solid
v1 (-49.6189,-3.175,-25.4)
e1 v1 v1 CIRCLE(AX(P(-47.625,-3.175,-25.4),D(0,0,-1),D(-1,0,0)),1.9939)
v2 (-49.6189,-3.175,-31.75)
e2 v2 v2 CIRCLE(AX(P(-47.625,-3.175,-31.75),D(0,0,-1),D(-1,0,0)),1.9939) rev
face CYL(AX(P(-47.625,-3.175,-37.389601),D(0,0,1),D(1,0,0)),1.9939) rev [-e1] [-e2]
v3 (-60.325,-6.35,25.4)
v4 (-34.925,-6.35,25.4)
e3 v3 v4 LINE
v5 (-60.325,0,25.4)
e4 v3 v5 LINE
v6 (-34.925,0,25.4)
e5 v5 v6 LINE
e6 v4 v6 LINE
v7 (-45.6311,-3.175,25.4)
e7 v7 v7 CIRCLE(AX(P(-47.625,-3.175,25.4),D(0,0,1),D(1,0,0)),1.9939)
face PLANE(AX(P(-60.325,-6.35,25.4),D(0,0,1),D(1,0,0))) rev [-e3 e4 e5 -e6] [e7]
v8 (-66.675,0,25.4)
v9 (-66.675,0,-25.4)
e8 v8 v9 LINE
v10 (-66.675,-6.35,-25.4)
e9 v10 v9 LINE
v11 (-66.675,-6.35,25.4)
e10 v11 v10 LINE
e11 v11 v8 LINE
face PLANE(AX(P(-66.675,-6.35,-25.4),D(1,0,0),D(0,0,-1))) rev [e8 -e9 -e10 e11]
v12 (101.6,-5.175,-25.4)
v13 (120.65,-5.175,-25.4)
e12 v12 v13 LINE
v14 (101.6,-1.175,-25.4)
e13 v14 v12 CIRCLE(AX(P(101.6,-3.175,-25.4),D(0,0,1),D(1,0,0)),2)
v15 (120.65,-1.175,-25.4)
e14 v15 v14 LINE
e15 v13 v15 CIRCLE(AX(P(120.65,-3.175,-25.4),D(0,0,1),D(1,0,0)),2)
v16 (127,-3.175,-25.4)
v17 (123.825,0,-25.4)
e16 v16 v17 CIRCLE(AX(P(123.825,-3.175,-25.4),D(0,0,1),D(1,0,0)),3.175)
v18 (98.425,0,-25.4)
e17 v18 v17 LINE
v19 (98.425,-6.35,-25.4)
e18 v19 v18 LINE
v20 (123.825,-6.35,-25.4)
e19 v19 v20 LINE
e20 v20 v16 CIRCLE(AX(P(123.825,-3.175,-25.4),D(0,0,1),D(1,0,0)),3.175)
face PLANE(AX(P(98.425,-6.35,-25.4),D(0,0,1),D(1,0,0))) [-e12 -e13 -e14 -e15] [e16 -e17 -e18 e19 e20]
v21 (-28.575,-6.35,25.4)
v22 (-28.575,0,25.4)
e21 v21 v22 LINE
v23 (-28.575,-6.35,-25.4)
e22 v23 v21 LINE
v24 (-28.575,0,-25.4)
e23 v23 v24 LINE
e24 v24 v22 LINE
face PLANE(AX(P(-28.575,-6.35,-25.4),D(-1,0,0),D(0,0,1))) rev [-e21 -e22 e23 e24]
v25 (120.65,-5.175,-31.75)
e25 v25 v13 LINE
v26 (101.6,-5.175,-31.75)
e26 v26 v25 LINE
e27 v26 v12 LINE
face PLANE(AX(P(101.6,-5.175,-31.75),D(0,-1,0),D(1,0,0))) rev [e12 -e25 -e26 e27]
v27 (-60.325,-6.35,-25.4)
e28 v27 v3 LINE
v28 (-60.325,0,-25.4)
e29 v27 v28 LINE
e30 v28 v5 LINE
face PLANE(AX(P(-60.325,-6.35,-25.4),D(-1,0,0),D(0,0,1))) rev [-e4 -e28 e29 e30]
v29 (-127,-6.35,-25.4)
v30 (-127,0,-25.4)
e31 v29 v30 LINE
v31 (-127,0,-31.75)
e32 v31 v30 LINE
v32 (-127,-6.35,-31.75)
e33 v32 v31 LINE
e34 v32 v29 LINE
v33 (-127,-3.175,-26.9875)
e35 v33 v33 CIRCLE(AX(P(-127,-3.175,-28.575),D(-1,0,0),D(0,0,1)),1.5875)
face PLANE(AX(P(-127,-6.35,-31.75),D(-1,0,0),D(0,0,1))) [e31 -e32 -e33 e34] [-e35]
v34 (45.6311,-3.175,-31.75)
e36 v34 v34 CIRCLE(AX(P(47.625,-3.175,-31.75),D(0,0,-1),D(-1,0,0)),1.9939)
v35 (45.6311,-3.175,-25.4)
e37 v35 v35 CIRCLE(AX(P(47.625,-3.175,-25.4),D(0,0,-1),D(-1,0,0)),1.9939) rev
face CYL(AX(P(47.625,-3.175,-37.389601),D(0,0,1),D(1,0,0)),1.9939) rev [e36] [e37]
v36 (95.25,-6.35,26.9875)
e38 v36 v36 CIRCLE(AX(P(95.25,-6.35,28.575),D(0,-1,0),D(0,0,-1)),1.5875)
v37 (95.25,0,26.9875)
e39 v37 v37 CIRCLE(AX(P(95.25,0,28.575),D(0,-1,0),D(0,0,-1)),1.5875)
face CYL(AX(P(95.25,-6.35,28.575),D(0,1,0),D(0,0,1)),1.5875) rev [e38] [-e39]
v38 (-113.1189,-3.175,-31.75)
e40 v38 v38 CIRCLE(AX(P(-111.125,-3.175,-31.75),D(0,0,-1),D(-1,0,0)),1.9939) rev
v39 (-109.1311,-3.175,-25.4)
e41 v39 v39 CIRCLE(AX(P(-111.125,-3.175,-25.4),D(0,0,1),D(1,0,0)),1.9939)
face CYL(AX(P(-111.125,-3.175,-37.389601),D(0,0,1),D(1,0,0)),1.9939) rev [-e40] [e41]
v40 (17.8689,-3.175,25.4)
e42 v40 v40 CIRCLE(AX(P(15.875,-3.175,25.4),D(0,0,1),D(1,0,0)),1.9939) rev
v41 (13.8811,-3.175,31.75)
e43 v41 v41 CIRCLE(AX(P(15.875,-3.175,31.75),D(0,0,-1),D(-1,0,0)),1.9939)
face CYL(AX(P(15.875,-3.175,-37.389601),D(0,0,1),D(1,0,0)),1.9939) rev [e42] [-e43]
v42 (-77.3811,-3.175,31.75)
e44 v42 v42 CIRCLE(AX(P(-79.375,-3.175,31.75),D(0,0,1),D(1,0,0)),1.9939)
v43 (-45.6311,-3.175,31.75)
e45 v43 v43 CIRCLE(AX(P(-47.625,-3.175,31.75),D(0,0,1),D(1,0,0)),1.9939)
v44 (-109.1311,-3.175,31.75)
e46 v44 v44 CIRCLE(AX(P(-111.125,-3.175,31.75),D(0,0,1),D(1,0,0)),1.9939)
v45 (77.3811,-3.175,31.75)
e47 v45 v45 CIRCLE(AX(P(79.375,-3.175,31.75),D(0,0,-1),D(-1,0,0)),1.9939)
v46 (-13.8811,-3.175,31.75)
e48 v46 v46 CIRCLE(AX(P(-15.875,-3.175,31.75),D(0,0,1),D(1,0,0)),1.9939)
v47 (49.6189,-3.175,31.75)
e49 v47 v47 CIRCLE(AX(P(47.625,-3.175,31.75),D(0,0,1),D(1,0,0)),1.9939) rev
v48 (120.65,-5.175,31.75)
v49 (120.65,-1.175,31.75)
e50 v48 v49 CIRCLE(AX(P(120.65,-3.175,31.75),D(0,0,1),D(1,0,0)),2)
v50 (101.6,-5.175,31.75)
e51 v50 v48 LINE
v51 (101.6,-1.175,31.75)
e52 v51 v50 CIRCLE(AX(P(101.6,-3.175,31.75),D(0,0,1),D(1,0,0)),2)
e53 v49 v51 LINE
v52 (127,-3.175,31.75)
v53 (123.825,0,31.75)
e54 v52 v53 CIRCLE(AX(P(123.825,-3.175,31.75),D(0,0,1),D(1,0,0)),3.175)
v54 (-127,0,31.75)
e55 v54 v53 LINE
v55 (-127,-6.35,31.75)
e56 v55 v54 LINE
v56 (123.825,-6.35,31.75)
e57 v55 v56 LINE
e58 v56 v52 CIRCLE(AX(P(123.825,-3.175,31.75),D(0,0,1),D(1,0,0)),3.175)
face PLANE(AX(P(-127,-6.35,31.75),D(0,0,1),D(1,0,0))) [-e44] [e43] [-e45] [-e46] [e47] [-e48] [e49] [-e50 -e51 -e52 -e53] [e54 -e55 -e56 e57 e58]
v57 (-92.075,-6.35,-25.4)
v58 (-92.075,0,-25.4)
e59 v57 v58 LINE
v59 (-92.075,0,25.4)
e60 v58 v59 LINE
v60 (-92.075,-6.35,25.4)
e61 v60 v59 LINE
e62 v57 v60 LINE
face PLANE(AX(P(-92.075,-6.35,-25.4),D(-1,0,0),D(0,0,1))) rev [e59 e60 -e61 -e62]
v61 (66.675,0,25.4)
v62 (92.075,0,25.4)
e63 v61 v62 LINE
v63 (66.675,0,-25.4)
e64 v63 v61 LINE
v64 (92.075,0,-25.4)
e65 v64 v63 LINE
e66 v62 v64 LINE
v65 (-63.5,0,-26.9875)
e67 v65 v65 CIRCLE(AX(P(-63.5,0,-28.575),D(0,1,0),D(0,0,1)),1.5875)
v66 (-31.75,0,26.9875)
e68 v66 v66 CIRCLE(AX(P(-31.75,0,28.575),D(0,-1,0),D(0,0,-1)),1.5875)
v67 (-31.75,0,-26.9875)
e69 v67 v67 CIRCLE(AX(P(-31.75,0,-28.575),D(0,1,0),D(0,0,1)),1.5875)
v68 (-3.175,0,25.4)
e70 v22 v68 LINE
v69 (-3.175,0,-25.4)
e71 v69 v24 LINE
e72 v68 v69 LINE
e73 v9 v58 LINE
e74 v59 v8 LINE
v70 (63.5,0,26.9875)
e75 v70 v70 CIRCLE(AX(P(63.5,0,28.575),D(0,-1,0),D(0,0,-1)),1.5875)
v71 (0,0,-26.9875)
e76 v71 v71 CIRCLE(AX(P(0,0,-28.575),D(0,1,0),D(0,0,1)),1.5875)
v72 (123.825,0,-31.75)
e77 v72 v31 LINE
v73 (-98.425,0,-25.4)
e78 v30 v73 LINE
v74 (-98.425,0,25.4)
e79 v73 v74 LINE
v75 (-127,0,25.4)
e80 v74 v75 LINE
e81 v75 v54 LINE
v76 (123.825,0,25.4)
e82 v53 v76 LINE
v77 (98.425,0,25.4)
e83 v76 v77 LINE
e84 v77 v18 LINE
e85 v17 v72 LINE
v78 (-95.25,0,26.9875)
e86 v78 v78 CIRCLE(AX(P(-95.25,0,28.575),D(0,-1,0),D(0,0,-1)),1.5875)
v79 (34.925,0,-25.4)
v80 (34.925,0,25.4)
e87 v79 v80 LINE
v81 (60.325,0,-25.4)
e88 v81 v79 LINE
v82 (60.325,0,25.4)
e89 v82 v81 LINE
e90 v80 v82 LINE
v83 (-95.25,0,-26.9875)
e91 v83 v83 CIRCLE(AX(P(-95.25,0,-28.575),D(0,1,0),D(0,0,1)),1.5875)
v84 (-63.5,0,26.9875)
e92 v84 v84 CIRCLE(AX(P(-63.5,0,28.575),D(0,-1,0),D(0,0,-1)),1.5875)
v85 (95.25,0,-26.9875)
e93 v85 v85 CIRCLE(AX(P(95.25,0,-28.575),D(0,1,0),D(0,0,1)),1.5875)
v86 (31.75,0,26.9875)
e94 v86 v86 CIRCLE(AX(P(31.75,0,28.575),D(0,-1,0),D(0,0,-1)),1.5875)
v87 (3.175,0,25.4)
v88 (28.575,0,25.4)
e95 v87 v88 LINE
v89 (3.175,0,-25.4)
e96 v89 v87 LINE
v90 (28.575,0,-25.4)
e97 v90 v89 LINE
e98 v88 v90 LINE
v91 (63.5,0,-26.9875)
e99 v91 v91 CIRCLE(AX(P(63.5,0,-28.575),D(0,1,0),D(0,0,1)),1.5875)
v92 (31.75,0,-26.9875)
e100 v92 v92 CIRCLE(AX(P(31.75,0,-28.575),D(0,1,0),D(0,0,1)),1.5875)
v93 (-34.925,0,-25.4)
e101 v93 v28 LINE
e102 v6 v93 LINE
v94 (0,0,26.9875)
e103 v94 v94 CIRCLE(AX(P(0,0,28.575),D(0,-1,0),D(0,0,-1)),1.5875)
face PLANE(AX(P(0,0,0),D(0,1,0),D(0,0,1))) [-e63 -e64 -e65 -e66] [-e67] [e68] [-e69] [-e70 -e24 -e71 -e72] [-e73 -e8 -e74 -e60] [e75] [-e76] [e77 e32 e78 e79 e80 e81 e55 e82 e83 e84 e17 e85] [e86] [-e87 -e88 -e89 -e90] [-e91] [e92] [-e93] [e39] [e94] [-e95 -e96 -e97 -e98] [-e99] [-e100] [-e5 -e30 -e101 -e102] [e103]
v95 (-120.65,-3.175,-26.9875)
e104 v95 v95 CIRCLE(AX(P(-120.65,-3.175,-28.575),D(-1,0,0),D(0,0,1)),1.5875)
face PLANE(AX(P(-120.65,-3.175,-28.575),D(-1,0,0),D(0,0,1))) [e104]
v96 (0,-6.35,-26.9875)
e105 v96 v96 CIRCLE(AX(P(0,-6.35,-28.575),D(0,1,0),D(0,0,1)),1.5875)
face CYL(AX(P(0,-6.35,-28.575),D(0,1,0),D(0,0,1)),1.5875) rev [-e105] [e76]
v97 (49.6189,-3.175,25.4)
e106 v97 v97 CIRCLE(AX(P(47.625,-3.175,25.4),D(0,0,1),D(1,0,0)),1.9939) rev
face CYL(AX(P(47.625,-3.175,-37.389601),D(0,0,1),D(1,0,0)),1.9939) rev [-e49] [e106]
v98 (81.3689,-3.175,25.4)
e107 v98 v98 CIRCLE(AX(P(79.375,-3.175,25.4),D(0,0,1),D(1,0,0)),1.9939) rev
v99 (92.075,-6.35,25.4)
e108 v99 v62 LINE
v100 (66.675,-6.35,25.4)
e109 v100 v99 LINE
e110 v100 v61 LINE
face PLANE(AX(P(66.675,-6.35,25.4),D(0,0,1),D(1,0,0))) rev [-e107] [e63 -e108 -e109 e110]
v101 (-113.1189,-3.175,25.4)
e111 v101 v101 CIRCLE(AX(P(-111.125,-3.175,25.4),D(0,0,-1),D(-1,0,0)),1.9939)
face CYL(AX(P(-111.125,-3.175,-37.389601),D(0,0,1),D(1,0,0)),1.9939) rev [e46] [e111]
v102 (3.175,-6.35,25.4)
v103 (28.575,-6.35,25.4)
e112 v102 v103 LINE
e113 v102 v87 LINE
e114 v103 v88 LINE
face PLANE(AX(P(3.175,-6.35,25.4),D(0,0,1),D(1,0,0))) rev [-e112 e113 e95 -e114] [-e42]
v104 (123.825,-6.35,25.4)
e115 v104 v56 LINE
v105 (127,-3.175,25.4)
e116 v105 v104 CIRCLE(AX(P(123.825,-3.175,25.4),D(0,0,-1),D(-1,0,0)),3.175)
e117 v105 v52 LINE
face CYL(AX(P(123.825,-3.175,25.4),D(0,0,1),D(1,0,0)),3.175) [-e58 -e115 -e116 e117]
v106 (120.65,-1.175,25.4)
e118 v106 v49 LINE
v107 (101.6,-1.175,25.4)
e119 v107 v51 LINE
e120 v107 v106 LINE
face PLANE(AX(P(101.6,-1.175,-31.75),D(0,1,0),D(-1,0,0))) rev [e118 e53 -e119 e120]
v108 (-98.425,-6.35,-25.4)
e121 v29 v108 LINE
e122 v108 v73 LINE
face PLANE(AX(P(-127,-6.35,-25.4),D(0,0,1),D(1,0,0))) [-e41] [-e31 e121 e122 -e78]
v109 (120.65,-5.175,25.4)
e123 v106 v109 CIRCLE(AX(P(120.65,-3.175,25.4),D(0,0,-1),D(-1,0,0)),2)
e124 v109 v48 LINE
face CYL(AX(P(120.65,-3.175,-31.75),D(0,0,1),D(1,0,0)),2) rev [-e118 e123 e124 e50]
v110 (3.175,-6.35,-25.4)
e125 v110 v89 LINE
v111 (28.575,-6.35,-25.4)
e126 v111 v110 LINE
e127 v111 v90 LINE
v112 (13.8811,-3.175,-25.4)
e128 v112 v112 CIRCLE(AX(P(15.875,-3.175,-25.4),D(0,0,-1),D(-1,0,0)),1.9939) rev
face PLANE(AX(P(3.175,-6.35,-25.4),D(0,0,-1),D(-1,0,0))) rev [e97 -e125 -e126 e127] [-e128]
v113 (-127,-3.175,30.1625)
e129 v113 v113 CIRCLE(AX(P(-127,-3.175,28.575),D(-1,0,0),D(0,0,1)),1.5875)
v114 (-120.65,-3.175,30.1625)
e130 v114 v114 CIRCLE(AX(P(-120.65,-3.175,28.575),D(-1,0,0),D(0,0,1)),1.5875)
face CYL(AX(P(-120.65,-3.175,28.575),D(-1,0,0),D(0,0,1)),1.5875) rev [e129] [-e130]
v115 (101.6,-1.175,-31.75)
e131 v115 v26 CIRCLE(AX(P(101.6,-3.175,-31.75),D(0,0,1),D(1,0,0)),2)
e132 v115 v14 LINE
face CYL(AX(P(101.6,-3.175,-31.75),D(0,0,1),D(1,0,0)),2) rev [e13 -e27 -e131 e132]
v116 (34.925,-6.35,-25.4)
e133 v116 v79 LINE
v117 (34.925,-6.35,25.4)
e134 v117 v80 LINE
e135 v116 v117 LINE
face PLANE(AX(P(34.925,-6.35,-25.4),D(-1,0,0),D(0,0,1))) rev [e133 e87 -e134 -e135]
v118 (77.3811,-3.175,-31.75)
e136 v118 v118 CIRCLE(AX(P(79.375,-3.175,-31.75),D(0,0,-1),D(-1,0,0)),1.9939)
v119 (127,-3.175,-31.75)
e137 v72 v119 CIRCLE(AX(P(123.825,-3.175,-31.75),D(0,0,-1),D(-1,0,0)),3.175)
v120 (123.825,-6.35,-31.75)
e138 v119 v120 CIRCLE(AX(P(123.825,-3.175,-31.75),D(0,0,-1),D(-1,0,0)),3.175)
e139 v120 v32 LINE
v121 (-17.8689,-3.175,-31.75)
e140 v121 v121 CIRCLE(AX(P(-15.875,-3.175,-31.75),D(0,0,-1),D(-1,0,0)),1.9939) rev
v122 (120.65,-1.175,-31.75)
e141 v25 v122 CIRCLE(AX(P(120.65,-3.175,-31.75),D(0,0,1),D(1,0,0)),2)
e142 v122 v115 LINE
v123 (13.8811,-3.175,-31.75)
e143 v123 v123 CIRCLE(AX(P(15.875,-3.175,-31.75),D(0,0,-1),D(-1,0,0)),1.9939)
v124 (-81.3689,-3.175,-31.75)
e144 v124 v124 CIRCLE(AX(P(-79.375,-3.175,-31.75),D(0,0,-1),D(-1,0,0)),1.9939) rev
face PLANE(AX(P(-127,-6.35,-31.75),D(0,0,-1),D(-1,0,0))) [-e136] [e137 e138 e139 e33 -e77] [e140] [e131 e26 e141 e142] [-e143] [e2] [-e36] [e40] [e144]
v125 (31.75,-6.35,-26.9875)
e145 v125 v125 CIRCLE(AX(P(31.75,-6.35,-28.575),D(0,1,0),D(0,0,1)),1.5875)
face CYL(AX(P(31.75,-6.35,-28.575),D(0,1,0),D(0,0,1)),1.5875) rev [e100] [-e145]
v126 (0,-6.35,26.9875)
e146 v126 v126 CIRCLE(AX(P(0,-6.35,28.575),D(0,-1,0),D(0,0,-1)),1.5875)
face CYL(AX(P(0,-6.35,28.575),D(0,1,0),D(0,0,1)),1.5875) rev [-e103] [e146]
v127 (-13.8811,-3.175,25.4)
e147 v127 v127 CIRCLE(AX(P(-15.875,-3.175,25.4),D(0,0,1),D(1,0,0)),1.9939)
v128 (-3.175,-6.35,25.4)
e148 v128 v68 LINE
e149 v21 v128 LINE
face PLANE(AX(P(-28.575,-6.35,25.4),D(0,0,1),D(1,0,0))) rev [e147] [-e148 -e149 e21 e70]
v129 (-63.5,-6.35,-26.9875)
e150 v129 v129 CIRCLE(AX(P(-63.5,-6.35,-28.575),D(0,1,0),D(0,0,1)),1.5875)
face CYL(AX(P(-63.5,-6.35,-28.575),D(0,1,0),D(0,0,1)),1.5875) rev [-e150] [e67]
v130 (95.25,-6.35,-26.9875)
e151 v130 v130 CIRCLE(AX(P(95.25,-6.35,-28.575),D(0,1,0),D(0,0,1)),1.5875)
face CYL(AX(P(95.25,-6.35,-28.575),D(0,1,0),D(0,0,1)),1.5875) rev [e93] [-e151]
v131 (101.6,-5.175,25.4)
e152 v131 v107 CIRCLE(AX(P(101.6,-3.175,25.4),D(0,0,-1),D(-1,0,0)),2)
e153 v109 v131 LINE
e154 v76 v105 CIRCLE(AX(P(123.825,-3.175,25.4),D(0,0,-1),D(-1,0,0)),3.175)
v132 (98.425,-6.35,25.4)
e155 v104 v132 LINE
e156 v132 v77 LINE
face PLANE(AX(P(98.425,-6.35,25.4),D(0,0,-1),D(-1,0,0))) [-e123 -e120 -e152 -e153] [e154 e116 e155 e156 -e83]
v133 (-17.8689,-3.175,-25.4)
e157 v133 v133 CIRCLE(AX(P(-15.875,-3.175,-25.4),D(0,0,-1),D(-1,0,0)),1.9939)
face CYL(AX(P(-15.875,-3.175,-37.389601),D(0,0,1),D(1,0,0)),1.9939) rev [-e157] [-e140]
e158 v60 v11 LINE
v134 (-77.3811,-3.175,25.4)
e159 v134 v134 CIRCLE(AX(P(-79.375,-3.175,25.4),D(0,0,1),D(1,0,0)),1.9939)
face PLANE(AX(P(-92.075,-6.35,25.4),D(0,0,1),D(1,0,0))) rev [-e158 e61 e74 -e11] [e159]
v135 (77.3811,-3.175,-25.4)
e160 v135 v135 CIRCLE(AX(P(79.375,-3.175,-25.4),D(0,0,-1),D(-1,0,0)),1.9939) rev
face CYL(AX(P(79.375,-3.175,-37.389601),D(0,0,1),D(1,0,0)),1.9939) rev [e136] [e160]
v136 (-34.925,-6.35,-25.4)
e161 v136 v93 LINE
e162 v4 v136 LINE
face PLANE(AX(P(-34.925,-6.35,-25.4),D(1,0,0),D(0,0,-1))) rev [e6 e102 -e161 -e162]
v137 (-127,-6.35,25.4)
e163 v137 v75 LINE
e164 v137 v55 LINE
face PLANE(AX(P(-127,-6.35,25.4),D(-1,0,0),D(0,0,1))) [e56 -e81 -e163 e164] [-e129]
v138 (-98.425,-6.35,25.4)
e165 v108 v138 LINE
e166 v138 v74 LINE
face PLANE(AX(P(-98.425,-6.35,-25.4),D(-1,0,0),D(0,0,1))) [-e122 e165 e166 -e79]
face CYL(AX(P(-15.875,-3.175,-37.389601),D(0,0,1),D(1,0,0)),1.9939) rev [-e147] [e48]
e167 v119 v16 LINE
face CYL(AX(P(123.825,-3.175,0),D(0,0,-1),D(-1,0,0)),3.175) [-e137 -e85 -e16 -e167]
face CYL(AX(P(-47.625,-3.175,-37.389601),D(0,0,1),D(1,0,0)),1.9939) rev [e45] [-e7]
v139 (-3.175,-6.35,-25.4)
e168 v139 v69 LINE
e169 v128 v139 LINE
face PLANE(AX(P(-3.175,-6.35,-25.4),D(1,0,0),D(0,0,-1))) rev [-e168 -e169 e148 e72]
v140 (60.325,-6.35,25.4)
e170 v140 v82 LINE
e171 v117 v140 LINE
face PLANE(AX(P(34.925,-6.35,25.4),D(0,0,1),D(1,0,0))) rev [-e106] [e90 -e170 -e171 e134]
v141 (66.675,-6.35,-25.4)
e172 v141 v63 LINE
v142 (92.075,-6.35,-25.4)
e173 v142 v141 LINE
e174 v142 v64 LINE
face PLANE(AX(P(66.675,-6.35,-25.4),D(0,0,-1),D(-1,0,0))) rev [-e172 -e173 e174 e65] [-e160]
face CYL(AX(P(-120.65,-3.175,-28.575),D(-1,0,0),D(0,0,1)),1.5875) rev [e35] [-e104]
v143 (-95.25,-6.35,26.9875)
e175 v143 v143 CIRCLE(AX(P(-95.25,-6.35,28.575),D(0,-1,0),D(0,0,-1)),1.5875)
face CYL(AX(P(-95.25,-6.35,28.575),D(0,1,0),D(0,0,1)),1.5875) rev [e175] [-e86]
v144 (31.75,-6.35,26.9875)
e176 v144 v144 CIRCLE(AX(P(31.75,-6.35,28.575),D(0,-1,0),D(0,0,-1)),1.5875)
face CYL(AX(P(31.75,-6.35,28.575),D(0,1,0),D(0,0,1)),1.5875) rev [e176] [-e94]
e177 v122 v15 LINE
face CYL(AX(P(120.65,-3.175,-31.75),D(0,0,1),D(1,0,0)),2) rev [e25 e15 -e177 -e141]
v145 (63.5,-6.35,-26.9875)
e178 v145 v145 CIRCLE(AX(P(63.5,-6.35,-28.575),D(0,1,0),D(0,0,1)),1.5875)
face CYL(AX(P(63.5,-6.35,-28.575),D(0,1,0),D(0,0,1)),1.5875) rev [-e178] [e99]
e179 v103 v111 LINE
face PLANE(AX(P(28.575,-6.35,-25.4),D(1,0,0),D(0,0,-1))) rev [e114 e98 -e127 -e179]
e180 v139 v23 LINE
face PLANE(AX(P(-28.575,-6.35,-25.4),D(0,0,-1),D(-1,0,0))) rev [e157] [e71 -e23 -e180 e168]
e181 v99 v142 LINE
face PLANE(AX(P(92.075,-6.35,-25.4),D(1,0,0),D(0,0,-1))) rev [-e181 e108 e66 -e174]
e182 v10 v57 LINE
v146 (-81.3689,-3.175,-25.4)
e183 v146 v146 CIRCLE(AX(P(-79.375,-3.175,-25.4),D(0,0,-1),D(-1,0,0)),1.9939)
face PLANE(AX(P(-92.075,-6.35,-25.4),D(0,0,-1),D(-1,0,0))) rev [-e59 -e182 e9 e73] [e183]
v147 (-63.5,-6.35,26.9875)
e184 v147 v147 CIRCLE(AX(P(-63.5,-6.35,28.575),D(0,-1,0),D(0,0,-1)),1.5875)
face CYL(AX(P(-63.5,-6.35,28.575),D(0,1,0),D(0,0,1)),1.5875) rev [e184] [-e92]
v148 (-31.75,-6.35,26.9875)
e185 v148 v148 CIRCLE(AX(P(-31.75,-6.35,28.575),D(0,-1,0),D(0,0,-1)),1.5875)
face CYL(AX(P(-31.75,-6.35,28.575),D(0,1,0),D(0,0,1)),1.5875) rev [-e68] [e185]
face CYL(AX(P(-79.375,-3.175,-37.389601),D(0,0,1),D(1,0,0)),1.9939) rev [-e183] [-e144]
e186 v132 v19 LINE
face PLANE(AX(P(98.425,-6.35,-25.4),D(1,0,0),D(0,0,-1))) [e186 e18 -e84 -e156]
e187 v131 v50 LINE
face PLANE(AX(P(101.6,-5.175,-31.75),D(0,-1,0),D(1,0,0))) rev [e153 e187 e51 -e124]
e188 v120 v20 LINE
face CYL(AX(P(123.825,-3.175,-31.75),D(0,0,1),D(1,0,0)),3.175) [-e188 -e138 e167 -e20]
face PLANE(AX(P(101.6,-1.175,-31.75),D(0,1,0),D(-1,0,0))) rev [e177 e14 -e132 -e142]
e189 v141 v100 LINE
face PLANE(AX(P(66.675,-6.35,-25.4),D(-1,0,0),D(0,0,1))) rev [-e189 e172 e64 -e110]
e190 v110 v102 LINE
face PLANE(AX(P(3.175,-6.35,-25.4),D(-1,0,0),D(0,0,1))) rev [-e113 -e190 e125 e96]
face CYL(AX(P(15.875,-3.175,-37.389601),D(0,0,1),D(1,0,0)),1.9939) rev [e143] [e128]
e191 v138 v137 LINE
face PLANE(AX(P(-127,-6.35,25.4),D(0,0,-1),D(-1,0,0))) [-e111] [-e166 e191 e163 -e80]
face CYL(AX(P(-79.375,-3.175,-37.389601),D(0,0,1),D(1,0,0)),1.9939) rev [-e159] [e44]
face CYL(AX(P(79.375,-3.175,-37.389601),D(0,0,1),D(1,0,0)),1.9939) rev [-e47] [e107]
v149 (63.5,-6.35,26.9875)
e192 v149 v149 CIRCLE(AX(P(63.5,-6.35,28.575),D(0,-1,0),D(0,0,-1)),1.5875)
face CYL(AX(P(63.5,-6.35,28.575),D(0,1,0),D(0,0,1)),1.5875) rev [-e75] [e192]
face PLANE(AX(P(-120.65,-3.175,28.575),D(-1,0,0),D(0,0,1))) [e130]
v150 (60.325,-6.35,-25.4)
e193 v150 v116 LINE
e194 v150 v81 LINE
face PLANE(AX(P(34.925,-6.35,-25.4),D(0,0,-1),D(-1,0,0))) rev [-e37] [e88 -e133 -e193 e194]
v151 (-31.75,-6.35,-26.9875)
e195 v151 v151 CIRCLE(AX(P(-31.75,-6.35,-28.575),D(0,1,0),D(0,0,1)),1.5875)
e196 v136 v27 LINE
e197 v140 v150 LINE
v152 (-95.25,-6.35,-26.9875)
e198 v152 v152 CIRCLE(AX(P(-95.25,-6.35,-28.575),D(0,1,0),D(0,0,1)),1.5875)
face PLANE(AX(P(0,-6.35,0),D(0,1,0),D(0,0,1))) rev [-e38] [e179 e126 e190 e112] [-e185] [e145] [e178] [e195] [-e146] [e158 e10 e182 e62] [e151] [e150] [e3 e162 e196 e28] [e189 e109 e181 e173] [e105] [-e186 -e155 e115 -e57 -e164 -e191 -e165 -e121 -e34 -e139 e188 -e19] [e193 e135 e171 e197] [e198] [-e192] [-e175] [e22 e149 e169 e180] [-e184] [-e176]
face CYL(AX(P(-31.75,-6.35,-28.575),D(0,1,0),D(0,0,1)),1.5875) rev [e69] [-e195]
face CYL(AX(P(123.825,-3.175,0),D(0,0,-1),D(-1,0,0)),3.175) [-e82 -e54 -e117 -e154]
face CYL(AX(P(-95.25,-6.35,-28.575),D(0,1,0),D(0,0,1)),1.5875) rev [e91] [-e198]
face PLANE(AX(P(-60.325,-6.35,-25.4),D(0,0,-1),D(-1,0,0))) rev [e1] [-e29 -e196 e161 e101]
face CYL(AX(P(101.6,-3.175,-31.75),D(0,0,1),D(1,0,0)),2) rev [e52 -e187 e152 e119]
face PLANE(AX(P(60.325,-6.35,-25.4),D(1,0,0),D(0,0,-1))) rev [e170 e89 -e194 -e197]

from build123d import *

# Parameters (mm, degrees)
SKETCH1_W           = 25.4
SKETCH1_H           = 50.8
BOSS_EXTRUDE1_DEPTH = 6.35
CUT_EXTRUDE1_REACH  = 144.132
SKETCH2_R           = 1.9939
CUT_EXTRUDE2_DEPTH  = 143.132235964
SKETCH4_R           = 1.5875
CUT_EXTRUDE3_DEPTH  = 132.062523247
FILLET1_R           = 3.175
SKETCH6_R           = 1.5875
CUT_EXTRUDE4_DEPTH  = 6.35


with BuildPart() as part:
    # Sketch1 → Boss-Extrude1 (new body)
    with BuildSketch(Plane(origin=(0, 0, 0), x_dir=(1, 0, 0), z_dir=(0, 1, 0))):
        Polygon((-127, 25.4), (-98.425, 25.4), (-98.425, -25.4), (-127, -25.4), (-127, -31.75), (127, -31.75), (127, -25.4), (98.425, -25.4), (98.425, 25.4), (127, 25.4), (127, 31.75), (-127, 31.75), align=None)
        with Locations((-15.875, 0)):
            Rectangle(SKETCH1_W, SKETCH1_H, mode=Mode.SUBTRACT)
        with Locations((-47.625, 0)):
            Rectangle(SKETCH1_W, SKETCH1_H, mode=Mode.SUBTRACT)
        with Locations((-79.375, 0)):
            Rectangle(SKETCH1_W, SKETCH1_H, mode=Mode.SUBTRACT)
        with Locations((79.375, 0)):
            Rectangle(SKETCH1_W, SKETCH1_H, mode=Mode.SUBTRACT)
        with Locations((47.625, 0)):
            Rectangle(SKETCH1_W, SKETCH1_H, mode=Mode.SUBTRACT)
        with Locations((15.875, 0)):
            Rectangle(SKETCH1_W, SKETCH1_H, mode=Mode.SUBTRACT)
    extrude(amount=-BOSS_EXTRUDE1_DEPTH)

    # Cut-Extrude1: up to this face of the body (flat: up to its plane)
    cut_extrude1_end = Plane(part.part.faces().sort_by_distance((0, -3.175, -31.75))[0])
    # Sketch2 → Cut-Extrude1 (cut, up to the picked face)
    with BuildSketch(Plane.XY.offset(31.75), mode=Mode.PRIVATE) as cut_extrude1_sk1:
        with Locations((-79.375, -3.175)):
            Circle(SKETCH2_R)
    cut_extrude1_tool1 = split(extrude(cut_extrude1_sk1.sketch, amount=-CUT_EXTRUDE1_REACH, mode=Mode.PRIVATE), bisect_by=cut_extrude1_end, keep=Keep.BOTH, mode=Mode.PRIVATE)
    # Sketch2 → Cut-Extrude1 (cut, up to the picked face)
    with BuildSketch(Plane.XY.offset(31.75), mode=Mode.PRIVATE) as cut_extrude1_sk2:
        with Locations((-47.625, -3.175)):
            Circle(SKETCH2_R)
    cut_extrude1_tool2 = split(extrude(cut_extrude1_sk2.sketch, amount=-CUT_EXTRUDE1_REACH, mode=Mode.PRIVATE), bisect_by=cut_extrude1_end, keep=Keep.BOTH, mode=Mode.PRIVATE)
    # Sketch2 → Cut-Extrude1 (cut, up to the picked face)
    with BuildSketch(Plane.XY.offset(31.75), mode=Mode.PRIVATE) as cut_extrude1_sk3:
        with Locations((-15.875, -3.175)):
            Circle(SKETCH2_R)
    cut_extrude1_tool3 = split(extrude(cut_extrude1_sk3.sketch, amount=-CUT_EXTRUDE1_REACH, mode=Mode.PRIVATE), bisect_by=cut_extrude1_end, keep=Keep.BOTH, mode=Mode.PRIVATE)
    # Sketch2 → Cut-Extrude1 (cut, up to the picked face)
    with BuildSketch(Plane.XY.offset(31.75), mode=Mode.PRIVATE) as cut_extrude1_sk4:
        with Locations((-111.125, -3.175)):
            Circle(SKETCH2_R)
    cut_extrude1_tool4 = split(extrude(cut_extrude1_sk4.sketch, amount=-CUT_EXTRUDE1_REACH, mode=Mode.PRIVATE), bisect_by=cut_extrude1_end, keep=Keep.BOTH, mode=Mode.PRIVATE)
    # Sketch2 → Cut-Extrude1 (cut, up to the picked face)
    with BuildSketch(Plane.XY.offset(31.75), mode=Mode.PRIVATE) as cut_extrude1_sk5:
        with Locations((15.875, -3.175)):
            Circle(SKETCH2_R)
    cut_extrude1_tool5 = split(extrude(cut_extrude1_sk5.sketch, amount=-CUT_EXTRUDE1_REACH, mode=Mode.PRIVATE), bisect_by=cut_extrude1_end, keep=Keep.BOTH, mode=Mode.PRIVATE)
    # Sketch2 → Cut-Extrude1 (cut, up to the picked face)
    with BuildSketch(Plane.XY.offset(31.75), mode=Mode.PRIVATE) as cut_extrude1_sk6:
        with Locations((47.625, -3.175)):
            Circle(SKETCH2_R)
    cut_extrude1_tool6 = split(extrude(cut_extrude1_sk6.sketch, amount=-CUT_EXTRUDE1_REACH, mode=Mode.PRIVATE), bisect_by=cut_extrude1_end, keep=Keep.BOTH, mode=Mode.PRIVATE)
    # Sketch2 → Cut-Extrude1 (cut, up to the picked face)
    with BuildSketch(Plane.XY.offset(31.75), mode=Mode.PRIVATE) as cut_extrude1_sk7:
        with Locations((79.375, -3.175)):
            Circle(SKETCH2_R)
    cut_extrude1_tool7 = split(extrude(cut_extrude1_sk7.sketch, amount=-CUT_EXTRUDE1_REACH, mode=Mode.PRIVATE), bisect_by=cut_extrude1_end, keep=Keep.BOTH, mode=Mode.PRIVATE)
    # Sketch2 → Cut-Extrude1 (cut, up to the picked face)
    with BuildSketch(Plane.XY.offset(31.75), mode=Mode.PRIVATE) as cut_extrude1_sk8:
        with Locations(Location((111.125, -3.175, 0), (0, 0, 180))):
            Circle(SKETCH2_R)
    cut_extrude1_tool8 = split(extrude(cut_extrude1_sk8.sketch, amount=-CUT_EXTRUDE1_REACH, mode=Mode.PRIVATE), bisect_by=cut_extrude1_end, keep=Keep.BOTH, mode=Mode.PRIVATE)
    add(cut_extrude1_tool1.solids().sort_by(Axis((-79.375, -3.175, 31.75), (0, 0, -1)))[0], mode=Mode.SUBTRACT)
    add(cut_extrude1_tool2.solids().sort_by(Axis((-47.625, -3.175, 31.75), (0, 0, -1)))[0], mode=Mode.SUBTRACT)
    add(cut_extrude1_tool3.solids().sort_by(Axis((-15.875, -3.175, 31.75), (0, 0, -1)))[0], mode=Mode.SUBTRACT)
    add(cut_extrude1_tool4.solids().sort_by(Axis((-111.125, -3.175, 31.75), (0, 0, -1)))[0], mode=Mode.SUBTRACT)
    add(cut_extrude1_tool5.solids().sort_by(Axis((15.875, -3.175, 31.75), (0, 0, -1)))[0], mode=Mode.SUBTRACT)
    add(cut_extrude1_tool6.solids().sort_by(Axis((47.625, -3.175, 31.75), (0, 0, -1)))[0], mode=Mode.SUBTRACT)
    add(cut_extrude1_tool7.solids().sort_by(Axis((79.375, -3.175, 31.75), (0, 0, -1)))[0], mode=Mode.SUBTRACT)
    add(cut_extrude1_tool8.solids().sort_by(Axis((111.125, -3.175, 31.75), (0, 0, -1)))[0], mode=Mode.SUBTRACT)

    # Sketch3 → Cut-Extrude2 (cut, through all)
    with BuildSketch(Plane.XY.offset(31.75)):
        with BuildLine():
            Line((101.6, -1.175), (120.65, -1.175))
            ThreePointArc((120.65, -1.175), (122.65, -3.175), (120.65, -5.175))
            Line((120.65, -5.175), (101.6, -5.175))
            ThreePointArc((101.6, -5.175), (99.6, -3.175), (101.6, -1.175))
        make_face()
    extrude(amount=-CUT_EXTRUDE2_DEPTH, mode=Mode.SUBTRACT)

    # Sketch4 → Cut-Extrude3 (cut, through all)
    with BuildSketch(Plane(origin=(0, 0, 0), x_dir=(1, 0, 0), z_dir=(0, 1, 0))):
        with Locations(Location((-95.25, 28.575, 0), (0, 0, 270))):
            Circle(SKETCH4_R)
        with Locations(Location((-63.5, 28.575, 0), (0, 0, 270))):
            Circle(SKETCH4_R)
        with Locations(Location((-31.75, 28.575, 0), (0, 0, 270))):
            Circle(SKETCH4_R)
        with Locations(Location((0, 28.575, 0), (0, 0, 270))):
            Circle(SKETCH4_R)
        with Locations(Location((31.75, 28.575, 0), (0, 0, 270))):
            Circle(SKETCH4_R)
        with Locations(Location((63.5, 28.575, 0), (0, 0, 270))):
            Circle(SKETCH4_R)
        with Locations(Location((95.25, 28.575, 0), (0, 0, 270))):
            Circle(SKETCH4_R)
        with Locations(Location((95.25, -28.575, 0), (0, 0, 90))):
            Circle(SKETCH4_R)
        with Locations(Location((63.5, -28.575, 0), (0, 0, 90))):
            Circle(SKETCH4_R)
        with Locations(Location((31.75, -28.575, 0), (0, 0, 90))):
            Circle(SKETCH4_R)
        with Locations(Location((0, -28.575, 0), (0, 0, 90))):
            Circle(SKETCH4_R)
        with Locations(Location((-31.75, -28.575, 0), (0, 0, 90))):
            Circle(SKETCH4_R)
        with Locations(Location((-63.5, -28.575, 0), (0, 0, 90))):
            Circle(SKETCH4_R)
        with Locations(Location((-95.25, -28.575, 0), (0, 0, 90))):
            Circle(SKETCH4_R)
    extrude(amount=-CUT_EXTRUDE3_DEPTH, mode=Mode.SUBTRACT)

    # Fillet1
    fillet1_edges = [part.edges().sort_by_distance(p)[0] for p in [
        (127, -6.35, -28.575),
        (127, 0, -28.575),
        (127, -6.35, 28.575),
        (127, 0, 28.575),
    ]]
    fillet(fillet1_edges, radius=FILLET1_R - 0.0001)  # a hair under: the kernel refuses the full size

    # Sketch6 → Cut-Extrude4 (cut)
    with BuildSketch(Plane.ZY.offset(127)):
        with Locations((-28.575, -3.175)):
            Circle(SKETCH6_R)
        with Locations((28.575, -3.175)):
            Circle(SKETCH6_R)
    extrude(amount=-CUT_EXTRUDE4_DEPTH, mode=Mode.SUBTRACT)


solid = part.part
